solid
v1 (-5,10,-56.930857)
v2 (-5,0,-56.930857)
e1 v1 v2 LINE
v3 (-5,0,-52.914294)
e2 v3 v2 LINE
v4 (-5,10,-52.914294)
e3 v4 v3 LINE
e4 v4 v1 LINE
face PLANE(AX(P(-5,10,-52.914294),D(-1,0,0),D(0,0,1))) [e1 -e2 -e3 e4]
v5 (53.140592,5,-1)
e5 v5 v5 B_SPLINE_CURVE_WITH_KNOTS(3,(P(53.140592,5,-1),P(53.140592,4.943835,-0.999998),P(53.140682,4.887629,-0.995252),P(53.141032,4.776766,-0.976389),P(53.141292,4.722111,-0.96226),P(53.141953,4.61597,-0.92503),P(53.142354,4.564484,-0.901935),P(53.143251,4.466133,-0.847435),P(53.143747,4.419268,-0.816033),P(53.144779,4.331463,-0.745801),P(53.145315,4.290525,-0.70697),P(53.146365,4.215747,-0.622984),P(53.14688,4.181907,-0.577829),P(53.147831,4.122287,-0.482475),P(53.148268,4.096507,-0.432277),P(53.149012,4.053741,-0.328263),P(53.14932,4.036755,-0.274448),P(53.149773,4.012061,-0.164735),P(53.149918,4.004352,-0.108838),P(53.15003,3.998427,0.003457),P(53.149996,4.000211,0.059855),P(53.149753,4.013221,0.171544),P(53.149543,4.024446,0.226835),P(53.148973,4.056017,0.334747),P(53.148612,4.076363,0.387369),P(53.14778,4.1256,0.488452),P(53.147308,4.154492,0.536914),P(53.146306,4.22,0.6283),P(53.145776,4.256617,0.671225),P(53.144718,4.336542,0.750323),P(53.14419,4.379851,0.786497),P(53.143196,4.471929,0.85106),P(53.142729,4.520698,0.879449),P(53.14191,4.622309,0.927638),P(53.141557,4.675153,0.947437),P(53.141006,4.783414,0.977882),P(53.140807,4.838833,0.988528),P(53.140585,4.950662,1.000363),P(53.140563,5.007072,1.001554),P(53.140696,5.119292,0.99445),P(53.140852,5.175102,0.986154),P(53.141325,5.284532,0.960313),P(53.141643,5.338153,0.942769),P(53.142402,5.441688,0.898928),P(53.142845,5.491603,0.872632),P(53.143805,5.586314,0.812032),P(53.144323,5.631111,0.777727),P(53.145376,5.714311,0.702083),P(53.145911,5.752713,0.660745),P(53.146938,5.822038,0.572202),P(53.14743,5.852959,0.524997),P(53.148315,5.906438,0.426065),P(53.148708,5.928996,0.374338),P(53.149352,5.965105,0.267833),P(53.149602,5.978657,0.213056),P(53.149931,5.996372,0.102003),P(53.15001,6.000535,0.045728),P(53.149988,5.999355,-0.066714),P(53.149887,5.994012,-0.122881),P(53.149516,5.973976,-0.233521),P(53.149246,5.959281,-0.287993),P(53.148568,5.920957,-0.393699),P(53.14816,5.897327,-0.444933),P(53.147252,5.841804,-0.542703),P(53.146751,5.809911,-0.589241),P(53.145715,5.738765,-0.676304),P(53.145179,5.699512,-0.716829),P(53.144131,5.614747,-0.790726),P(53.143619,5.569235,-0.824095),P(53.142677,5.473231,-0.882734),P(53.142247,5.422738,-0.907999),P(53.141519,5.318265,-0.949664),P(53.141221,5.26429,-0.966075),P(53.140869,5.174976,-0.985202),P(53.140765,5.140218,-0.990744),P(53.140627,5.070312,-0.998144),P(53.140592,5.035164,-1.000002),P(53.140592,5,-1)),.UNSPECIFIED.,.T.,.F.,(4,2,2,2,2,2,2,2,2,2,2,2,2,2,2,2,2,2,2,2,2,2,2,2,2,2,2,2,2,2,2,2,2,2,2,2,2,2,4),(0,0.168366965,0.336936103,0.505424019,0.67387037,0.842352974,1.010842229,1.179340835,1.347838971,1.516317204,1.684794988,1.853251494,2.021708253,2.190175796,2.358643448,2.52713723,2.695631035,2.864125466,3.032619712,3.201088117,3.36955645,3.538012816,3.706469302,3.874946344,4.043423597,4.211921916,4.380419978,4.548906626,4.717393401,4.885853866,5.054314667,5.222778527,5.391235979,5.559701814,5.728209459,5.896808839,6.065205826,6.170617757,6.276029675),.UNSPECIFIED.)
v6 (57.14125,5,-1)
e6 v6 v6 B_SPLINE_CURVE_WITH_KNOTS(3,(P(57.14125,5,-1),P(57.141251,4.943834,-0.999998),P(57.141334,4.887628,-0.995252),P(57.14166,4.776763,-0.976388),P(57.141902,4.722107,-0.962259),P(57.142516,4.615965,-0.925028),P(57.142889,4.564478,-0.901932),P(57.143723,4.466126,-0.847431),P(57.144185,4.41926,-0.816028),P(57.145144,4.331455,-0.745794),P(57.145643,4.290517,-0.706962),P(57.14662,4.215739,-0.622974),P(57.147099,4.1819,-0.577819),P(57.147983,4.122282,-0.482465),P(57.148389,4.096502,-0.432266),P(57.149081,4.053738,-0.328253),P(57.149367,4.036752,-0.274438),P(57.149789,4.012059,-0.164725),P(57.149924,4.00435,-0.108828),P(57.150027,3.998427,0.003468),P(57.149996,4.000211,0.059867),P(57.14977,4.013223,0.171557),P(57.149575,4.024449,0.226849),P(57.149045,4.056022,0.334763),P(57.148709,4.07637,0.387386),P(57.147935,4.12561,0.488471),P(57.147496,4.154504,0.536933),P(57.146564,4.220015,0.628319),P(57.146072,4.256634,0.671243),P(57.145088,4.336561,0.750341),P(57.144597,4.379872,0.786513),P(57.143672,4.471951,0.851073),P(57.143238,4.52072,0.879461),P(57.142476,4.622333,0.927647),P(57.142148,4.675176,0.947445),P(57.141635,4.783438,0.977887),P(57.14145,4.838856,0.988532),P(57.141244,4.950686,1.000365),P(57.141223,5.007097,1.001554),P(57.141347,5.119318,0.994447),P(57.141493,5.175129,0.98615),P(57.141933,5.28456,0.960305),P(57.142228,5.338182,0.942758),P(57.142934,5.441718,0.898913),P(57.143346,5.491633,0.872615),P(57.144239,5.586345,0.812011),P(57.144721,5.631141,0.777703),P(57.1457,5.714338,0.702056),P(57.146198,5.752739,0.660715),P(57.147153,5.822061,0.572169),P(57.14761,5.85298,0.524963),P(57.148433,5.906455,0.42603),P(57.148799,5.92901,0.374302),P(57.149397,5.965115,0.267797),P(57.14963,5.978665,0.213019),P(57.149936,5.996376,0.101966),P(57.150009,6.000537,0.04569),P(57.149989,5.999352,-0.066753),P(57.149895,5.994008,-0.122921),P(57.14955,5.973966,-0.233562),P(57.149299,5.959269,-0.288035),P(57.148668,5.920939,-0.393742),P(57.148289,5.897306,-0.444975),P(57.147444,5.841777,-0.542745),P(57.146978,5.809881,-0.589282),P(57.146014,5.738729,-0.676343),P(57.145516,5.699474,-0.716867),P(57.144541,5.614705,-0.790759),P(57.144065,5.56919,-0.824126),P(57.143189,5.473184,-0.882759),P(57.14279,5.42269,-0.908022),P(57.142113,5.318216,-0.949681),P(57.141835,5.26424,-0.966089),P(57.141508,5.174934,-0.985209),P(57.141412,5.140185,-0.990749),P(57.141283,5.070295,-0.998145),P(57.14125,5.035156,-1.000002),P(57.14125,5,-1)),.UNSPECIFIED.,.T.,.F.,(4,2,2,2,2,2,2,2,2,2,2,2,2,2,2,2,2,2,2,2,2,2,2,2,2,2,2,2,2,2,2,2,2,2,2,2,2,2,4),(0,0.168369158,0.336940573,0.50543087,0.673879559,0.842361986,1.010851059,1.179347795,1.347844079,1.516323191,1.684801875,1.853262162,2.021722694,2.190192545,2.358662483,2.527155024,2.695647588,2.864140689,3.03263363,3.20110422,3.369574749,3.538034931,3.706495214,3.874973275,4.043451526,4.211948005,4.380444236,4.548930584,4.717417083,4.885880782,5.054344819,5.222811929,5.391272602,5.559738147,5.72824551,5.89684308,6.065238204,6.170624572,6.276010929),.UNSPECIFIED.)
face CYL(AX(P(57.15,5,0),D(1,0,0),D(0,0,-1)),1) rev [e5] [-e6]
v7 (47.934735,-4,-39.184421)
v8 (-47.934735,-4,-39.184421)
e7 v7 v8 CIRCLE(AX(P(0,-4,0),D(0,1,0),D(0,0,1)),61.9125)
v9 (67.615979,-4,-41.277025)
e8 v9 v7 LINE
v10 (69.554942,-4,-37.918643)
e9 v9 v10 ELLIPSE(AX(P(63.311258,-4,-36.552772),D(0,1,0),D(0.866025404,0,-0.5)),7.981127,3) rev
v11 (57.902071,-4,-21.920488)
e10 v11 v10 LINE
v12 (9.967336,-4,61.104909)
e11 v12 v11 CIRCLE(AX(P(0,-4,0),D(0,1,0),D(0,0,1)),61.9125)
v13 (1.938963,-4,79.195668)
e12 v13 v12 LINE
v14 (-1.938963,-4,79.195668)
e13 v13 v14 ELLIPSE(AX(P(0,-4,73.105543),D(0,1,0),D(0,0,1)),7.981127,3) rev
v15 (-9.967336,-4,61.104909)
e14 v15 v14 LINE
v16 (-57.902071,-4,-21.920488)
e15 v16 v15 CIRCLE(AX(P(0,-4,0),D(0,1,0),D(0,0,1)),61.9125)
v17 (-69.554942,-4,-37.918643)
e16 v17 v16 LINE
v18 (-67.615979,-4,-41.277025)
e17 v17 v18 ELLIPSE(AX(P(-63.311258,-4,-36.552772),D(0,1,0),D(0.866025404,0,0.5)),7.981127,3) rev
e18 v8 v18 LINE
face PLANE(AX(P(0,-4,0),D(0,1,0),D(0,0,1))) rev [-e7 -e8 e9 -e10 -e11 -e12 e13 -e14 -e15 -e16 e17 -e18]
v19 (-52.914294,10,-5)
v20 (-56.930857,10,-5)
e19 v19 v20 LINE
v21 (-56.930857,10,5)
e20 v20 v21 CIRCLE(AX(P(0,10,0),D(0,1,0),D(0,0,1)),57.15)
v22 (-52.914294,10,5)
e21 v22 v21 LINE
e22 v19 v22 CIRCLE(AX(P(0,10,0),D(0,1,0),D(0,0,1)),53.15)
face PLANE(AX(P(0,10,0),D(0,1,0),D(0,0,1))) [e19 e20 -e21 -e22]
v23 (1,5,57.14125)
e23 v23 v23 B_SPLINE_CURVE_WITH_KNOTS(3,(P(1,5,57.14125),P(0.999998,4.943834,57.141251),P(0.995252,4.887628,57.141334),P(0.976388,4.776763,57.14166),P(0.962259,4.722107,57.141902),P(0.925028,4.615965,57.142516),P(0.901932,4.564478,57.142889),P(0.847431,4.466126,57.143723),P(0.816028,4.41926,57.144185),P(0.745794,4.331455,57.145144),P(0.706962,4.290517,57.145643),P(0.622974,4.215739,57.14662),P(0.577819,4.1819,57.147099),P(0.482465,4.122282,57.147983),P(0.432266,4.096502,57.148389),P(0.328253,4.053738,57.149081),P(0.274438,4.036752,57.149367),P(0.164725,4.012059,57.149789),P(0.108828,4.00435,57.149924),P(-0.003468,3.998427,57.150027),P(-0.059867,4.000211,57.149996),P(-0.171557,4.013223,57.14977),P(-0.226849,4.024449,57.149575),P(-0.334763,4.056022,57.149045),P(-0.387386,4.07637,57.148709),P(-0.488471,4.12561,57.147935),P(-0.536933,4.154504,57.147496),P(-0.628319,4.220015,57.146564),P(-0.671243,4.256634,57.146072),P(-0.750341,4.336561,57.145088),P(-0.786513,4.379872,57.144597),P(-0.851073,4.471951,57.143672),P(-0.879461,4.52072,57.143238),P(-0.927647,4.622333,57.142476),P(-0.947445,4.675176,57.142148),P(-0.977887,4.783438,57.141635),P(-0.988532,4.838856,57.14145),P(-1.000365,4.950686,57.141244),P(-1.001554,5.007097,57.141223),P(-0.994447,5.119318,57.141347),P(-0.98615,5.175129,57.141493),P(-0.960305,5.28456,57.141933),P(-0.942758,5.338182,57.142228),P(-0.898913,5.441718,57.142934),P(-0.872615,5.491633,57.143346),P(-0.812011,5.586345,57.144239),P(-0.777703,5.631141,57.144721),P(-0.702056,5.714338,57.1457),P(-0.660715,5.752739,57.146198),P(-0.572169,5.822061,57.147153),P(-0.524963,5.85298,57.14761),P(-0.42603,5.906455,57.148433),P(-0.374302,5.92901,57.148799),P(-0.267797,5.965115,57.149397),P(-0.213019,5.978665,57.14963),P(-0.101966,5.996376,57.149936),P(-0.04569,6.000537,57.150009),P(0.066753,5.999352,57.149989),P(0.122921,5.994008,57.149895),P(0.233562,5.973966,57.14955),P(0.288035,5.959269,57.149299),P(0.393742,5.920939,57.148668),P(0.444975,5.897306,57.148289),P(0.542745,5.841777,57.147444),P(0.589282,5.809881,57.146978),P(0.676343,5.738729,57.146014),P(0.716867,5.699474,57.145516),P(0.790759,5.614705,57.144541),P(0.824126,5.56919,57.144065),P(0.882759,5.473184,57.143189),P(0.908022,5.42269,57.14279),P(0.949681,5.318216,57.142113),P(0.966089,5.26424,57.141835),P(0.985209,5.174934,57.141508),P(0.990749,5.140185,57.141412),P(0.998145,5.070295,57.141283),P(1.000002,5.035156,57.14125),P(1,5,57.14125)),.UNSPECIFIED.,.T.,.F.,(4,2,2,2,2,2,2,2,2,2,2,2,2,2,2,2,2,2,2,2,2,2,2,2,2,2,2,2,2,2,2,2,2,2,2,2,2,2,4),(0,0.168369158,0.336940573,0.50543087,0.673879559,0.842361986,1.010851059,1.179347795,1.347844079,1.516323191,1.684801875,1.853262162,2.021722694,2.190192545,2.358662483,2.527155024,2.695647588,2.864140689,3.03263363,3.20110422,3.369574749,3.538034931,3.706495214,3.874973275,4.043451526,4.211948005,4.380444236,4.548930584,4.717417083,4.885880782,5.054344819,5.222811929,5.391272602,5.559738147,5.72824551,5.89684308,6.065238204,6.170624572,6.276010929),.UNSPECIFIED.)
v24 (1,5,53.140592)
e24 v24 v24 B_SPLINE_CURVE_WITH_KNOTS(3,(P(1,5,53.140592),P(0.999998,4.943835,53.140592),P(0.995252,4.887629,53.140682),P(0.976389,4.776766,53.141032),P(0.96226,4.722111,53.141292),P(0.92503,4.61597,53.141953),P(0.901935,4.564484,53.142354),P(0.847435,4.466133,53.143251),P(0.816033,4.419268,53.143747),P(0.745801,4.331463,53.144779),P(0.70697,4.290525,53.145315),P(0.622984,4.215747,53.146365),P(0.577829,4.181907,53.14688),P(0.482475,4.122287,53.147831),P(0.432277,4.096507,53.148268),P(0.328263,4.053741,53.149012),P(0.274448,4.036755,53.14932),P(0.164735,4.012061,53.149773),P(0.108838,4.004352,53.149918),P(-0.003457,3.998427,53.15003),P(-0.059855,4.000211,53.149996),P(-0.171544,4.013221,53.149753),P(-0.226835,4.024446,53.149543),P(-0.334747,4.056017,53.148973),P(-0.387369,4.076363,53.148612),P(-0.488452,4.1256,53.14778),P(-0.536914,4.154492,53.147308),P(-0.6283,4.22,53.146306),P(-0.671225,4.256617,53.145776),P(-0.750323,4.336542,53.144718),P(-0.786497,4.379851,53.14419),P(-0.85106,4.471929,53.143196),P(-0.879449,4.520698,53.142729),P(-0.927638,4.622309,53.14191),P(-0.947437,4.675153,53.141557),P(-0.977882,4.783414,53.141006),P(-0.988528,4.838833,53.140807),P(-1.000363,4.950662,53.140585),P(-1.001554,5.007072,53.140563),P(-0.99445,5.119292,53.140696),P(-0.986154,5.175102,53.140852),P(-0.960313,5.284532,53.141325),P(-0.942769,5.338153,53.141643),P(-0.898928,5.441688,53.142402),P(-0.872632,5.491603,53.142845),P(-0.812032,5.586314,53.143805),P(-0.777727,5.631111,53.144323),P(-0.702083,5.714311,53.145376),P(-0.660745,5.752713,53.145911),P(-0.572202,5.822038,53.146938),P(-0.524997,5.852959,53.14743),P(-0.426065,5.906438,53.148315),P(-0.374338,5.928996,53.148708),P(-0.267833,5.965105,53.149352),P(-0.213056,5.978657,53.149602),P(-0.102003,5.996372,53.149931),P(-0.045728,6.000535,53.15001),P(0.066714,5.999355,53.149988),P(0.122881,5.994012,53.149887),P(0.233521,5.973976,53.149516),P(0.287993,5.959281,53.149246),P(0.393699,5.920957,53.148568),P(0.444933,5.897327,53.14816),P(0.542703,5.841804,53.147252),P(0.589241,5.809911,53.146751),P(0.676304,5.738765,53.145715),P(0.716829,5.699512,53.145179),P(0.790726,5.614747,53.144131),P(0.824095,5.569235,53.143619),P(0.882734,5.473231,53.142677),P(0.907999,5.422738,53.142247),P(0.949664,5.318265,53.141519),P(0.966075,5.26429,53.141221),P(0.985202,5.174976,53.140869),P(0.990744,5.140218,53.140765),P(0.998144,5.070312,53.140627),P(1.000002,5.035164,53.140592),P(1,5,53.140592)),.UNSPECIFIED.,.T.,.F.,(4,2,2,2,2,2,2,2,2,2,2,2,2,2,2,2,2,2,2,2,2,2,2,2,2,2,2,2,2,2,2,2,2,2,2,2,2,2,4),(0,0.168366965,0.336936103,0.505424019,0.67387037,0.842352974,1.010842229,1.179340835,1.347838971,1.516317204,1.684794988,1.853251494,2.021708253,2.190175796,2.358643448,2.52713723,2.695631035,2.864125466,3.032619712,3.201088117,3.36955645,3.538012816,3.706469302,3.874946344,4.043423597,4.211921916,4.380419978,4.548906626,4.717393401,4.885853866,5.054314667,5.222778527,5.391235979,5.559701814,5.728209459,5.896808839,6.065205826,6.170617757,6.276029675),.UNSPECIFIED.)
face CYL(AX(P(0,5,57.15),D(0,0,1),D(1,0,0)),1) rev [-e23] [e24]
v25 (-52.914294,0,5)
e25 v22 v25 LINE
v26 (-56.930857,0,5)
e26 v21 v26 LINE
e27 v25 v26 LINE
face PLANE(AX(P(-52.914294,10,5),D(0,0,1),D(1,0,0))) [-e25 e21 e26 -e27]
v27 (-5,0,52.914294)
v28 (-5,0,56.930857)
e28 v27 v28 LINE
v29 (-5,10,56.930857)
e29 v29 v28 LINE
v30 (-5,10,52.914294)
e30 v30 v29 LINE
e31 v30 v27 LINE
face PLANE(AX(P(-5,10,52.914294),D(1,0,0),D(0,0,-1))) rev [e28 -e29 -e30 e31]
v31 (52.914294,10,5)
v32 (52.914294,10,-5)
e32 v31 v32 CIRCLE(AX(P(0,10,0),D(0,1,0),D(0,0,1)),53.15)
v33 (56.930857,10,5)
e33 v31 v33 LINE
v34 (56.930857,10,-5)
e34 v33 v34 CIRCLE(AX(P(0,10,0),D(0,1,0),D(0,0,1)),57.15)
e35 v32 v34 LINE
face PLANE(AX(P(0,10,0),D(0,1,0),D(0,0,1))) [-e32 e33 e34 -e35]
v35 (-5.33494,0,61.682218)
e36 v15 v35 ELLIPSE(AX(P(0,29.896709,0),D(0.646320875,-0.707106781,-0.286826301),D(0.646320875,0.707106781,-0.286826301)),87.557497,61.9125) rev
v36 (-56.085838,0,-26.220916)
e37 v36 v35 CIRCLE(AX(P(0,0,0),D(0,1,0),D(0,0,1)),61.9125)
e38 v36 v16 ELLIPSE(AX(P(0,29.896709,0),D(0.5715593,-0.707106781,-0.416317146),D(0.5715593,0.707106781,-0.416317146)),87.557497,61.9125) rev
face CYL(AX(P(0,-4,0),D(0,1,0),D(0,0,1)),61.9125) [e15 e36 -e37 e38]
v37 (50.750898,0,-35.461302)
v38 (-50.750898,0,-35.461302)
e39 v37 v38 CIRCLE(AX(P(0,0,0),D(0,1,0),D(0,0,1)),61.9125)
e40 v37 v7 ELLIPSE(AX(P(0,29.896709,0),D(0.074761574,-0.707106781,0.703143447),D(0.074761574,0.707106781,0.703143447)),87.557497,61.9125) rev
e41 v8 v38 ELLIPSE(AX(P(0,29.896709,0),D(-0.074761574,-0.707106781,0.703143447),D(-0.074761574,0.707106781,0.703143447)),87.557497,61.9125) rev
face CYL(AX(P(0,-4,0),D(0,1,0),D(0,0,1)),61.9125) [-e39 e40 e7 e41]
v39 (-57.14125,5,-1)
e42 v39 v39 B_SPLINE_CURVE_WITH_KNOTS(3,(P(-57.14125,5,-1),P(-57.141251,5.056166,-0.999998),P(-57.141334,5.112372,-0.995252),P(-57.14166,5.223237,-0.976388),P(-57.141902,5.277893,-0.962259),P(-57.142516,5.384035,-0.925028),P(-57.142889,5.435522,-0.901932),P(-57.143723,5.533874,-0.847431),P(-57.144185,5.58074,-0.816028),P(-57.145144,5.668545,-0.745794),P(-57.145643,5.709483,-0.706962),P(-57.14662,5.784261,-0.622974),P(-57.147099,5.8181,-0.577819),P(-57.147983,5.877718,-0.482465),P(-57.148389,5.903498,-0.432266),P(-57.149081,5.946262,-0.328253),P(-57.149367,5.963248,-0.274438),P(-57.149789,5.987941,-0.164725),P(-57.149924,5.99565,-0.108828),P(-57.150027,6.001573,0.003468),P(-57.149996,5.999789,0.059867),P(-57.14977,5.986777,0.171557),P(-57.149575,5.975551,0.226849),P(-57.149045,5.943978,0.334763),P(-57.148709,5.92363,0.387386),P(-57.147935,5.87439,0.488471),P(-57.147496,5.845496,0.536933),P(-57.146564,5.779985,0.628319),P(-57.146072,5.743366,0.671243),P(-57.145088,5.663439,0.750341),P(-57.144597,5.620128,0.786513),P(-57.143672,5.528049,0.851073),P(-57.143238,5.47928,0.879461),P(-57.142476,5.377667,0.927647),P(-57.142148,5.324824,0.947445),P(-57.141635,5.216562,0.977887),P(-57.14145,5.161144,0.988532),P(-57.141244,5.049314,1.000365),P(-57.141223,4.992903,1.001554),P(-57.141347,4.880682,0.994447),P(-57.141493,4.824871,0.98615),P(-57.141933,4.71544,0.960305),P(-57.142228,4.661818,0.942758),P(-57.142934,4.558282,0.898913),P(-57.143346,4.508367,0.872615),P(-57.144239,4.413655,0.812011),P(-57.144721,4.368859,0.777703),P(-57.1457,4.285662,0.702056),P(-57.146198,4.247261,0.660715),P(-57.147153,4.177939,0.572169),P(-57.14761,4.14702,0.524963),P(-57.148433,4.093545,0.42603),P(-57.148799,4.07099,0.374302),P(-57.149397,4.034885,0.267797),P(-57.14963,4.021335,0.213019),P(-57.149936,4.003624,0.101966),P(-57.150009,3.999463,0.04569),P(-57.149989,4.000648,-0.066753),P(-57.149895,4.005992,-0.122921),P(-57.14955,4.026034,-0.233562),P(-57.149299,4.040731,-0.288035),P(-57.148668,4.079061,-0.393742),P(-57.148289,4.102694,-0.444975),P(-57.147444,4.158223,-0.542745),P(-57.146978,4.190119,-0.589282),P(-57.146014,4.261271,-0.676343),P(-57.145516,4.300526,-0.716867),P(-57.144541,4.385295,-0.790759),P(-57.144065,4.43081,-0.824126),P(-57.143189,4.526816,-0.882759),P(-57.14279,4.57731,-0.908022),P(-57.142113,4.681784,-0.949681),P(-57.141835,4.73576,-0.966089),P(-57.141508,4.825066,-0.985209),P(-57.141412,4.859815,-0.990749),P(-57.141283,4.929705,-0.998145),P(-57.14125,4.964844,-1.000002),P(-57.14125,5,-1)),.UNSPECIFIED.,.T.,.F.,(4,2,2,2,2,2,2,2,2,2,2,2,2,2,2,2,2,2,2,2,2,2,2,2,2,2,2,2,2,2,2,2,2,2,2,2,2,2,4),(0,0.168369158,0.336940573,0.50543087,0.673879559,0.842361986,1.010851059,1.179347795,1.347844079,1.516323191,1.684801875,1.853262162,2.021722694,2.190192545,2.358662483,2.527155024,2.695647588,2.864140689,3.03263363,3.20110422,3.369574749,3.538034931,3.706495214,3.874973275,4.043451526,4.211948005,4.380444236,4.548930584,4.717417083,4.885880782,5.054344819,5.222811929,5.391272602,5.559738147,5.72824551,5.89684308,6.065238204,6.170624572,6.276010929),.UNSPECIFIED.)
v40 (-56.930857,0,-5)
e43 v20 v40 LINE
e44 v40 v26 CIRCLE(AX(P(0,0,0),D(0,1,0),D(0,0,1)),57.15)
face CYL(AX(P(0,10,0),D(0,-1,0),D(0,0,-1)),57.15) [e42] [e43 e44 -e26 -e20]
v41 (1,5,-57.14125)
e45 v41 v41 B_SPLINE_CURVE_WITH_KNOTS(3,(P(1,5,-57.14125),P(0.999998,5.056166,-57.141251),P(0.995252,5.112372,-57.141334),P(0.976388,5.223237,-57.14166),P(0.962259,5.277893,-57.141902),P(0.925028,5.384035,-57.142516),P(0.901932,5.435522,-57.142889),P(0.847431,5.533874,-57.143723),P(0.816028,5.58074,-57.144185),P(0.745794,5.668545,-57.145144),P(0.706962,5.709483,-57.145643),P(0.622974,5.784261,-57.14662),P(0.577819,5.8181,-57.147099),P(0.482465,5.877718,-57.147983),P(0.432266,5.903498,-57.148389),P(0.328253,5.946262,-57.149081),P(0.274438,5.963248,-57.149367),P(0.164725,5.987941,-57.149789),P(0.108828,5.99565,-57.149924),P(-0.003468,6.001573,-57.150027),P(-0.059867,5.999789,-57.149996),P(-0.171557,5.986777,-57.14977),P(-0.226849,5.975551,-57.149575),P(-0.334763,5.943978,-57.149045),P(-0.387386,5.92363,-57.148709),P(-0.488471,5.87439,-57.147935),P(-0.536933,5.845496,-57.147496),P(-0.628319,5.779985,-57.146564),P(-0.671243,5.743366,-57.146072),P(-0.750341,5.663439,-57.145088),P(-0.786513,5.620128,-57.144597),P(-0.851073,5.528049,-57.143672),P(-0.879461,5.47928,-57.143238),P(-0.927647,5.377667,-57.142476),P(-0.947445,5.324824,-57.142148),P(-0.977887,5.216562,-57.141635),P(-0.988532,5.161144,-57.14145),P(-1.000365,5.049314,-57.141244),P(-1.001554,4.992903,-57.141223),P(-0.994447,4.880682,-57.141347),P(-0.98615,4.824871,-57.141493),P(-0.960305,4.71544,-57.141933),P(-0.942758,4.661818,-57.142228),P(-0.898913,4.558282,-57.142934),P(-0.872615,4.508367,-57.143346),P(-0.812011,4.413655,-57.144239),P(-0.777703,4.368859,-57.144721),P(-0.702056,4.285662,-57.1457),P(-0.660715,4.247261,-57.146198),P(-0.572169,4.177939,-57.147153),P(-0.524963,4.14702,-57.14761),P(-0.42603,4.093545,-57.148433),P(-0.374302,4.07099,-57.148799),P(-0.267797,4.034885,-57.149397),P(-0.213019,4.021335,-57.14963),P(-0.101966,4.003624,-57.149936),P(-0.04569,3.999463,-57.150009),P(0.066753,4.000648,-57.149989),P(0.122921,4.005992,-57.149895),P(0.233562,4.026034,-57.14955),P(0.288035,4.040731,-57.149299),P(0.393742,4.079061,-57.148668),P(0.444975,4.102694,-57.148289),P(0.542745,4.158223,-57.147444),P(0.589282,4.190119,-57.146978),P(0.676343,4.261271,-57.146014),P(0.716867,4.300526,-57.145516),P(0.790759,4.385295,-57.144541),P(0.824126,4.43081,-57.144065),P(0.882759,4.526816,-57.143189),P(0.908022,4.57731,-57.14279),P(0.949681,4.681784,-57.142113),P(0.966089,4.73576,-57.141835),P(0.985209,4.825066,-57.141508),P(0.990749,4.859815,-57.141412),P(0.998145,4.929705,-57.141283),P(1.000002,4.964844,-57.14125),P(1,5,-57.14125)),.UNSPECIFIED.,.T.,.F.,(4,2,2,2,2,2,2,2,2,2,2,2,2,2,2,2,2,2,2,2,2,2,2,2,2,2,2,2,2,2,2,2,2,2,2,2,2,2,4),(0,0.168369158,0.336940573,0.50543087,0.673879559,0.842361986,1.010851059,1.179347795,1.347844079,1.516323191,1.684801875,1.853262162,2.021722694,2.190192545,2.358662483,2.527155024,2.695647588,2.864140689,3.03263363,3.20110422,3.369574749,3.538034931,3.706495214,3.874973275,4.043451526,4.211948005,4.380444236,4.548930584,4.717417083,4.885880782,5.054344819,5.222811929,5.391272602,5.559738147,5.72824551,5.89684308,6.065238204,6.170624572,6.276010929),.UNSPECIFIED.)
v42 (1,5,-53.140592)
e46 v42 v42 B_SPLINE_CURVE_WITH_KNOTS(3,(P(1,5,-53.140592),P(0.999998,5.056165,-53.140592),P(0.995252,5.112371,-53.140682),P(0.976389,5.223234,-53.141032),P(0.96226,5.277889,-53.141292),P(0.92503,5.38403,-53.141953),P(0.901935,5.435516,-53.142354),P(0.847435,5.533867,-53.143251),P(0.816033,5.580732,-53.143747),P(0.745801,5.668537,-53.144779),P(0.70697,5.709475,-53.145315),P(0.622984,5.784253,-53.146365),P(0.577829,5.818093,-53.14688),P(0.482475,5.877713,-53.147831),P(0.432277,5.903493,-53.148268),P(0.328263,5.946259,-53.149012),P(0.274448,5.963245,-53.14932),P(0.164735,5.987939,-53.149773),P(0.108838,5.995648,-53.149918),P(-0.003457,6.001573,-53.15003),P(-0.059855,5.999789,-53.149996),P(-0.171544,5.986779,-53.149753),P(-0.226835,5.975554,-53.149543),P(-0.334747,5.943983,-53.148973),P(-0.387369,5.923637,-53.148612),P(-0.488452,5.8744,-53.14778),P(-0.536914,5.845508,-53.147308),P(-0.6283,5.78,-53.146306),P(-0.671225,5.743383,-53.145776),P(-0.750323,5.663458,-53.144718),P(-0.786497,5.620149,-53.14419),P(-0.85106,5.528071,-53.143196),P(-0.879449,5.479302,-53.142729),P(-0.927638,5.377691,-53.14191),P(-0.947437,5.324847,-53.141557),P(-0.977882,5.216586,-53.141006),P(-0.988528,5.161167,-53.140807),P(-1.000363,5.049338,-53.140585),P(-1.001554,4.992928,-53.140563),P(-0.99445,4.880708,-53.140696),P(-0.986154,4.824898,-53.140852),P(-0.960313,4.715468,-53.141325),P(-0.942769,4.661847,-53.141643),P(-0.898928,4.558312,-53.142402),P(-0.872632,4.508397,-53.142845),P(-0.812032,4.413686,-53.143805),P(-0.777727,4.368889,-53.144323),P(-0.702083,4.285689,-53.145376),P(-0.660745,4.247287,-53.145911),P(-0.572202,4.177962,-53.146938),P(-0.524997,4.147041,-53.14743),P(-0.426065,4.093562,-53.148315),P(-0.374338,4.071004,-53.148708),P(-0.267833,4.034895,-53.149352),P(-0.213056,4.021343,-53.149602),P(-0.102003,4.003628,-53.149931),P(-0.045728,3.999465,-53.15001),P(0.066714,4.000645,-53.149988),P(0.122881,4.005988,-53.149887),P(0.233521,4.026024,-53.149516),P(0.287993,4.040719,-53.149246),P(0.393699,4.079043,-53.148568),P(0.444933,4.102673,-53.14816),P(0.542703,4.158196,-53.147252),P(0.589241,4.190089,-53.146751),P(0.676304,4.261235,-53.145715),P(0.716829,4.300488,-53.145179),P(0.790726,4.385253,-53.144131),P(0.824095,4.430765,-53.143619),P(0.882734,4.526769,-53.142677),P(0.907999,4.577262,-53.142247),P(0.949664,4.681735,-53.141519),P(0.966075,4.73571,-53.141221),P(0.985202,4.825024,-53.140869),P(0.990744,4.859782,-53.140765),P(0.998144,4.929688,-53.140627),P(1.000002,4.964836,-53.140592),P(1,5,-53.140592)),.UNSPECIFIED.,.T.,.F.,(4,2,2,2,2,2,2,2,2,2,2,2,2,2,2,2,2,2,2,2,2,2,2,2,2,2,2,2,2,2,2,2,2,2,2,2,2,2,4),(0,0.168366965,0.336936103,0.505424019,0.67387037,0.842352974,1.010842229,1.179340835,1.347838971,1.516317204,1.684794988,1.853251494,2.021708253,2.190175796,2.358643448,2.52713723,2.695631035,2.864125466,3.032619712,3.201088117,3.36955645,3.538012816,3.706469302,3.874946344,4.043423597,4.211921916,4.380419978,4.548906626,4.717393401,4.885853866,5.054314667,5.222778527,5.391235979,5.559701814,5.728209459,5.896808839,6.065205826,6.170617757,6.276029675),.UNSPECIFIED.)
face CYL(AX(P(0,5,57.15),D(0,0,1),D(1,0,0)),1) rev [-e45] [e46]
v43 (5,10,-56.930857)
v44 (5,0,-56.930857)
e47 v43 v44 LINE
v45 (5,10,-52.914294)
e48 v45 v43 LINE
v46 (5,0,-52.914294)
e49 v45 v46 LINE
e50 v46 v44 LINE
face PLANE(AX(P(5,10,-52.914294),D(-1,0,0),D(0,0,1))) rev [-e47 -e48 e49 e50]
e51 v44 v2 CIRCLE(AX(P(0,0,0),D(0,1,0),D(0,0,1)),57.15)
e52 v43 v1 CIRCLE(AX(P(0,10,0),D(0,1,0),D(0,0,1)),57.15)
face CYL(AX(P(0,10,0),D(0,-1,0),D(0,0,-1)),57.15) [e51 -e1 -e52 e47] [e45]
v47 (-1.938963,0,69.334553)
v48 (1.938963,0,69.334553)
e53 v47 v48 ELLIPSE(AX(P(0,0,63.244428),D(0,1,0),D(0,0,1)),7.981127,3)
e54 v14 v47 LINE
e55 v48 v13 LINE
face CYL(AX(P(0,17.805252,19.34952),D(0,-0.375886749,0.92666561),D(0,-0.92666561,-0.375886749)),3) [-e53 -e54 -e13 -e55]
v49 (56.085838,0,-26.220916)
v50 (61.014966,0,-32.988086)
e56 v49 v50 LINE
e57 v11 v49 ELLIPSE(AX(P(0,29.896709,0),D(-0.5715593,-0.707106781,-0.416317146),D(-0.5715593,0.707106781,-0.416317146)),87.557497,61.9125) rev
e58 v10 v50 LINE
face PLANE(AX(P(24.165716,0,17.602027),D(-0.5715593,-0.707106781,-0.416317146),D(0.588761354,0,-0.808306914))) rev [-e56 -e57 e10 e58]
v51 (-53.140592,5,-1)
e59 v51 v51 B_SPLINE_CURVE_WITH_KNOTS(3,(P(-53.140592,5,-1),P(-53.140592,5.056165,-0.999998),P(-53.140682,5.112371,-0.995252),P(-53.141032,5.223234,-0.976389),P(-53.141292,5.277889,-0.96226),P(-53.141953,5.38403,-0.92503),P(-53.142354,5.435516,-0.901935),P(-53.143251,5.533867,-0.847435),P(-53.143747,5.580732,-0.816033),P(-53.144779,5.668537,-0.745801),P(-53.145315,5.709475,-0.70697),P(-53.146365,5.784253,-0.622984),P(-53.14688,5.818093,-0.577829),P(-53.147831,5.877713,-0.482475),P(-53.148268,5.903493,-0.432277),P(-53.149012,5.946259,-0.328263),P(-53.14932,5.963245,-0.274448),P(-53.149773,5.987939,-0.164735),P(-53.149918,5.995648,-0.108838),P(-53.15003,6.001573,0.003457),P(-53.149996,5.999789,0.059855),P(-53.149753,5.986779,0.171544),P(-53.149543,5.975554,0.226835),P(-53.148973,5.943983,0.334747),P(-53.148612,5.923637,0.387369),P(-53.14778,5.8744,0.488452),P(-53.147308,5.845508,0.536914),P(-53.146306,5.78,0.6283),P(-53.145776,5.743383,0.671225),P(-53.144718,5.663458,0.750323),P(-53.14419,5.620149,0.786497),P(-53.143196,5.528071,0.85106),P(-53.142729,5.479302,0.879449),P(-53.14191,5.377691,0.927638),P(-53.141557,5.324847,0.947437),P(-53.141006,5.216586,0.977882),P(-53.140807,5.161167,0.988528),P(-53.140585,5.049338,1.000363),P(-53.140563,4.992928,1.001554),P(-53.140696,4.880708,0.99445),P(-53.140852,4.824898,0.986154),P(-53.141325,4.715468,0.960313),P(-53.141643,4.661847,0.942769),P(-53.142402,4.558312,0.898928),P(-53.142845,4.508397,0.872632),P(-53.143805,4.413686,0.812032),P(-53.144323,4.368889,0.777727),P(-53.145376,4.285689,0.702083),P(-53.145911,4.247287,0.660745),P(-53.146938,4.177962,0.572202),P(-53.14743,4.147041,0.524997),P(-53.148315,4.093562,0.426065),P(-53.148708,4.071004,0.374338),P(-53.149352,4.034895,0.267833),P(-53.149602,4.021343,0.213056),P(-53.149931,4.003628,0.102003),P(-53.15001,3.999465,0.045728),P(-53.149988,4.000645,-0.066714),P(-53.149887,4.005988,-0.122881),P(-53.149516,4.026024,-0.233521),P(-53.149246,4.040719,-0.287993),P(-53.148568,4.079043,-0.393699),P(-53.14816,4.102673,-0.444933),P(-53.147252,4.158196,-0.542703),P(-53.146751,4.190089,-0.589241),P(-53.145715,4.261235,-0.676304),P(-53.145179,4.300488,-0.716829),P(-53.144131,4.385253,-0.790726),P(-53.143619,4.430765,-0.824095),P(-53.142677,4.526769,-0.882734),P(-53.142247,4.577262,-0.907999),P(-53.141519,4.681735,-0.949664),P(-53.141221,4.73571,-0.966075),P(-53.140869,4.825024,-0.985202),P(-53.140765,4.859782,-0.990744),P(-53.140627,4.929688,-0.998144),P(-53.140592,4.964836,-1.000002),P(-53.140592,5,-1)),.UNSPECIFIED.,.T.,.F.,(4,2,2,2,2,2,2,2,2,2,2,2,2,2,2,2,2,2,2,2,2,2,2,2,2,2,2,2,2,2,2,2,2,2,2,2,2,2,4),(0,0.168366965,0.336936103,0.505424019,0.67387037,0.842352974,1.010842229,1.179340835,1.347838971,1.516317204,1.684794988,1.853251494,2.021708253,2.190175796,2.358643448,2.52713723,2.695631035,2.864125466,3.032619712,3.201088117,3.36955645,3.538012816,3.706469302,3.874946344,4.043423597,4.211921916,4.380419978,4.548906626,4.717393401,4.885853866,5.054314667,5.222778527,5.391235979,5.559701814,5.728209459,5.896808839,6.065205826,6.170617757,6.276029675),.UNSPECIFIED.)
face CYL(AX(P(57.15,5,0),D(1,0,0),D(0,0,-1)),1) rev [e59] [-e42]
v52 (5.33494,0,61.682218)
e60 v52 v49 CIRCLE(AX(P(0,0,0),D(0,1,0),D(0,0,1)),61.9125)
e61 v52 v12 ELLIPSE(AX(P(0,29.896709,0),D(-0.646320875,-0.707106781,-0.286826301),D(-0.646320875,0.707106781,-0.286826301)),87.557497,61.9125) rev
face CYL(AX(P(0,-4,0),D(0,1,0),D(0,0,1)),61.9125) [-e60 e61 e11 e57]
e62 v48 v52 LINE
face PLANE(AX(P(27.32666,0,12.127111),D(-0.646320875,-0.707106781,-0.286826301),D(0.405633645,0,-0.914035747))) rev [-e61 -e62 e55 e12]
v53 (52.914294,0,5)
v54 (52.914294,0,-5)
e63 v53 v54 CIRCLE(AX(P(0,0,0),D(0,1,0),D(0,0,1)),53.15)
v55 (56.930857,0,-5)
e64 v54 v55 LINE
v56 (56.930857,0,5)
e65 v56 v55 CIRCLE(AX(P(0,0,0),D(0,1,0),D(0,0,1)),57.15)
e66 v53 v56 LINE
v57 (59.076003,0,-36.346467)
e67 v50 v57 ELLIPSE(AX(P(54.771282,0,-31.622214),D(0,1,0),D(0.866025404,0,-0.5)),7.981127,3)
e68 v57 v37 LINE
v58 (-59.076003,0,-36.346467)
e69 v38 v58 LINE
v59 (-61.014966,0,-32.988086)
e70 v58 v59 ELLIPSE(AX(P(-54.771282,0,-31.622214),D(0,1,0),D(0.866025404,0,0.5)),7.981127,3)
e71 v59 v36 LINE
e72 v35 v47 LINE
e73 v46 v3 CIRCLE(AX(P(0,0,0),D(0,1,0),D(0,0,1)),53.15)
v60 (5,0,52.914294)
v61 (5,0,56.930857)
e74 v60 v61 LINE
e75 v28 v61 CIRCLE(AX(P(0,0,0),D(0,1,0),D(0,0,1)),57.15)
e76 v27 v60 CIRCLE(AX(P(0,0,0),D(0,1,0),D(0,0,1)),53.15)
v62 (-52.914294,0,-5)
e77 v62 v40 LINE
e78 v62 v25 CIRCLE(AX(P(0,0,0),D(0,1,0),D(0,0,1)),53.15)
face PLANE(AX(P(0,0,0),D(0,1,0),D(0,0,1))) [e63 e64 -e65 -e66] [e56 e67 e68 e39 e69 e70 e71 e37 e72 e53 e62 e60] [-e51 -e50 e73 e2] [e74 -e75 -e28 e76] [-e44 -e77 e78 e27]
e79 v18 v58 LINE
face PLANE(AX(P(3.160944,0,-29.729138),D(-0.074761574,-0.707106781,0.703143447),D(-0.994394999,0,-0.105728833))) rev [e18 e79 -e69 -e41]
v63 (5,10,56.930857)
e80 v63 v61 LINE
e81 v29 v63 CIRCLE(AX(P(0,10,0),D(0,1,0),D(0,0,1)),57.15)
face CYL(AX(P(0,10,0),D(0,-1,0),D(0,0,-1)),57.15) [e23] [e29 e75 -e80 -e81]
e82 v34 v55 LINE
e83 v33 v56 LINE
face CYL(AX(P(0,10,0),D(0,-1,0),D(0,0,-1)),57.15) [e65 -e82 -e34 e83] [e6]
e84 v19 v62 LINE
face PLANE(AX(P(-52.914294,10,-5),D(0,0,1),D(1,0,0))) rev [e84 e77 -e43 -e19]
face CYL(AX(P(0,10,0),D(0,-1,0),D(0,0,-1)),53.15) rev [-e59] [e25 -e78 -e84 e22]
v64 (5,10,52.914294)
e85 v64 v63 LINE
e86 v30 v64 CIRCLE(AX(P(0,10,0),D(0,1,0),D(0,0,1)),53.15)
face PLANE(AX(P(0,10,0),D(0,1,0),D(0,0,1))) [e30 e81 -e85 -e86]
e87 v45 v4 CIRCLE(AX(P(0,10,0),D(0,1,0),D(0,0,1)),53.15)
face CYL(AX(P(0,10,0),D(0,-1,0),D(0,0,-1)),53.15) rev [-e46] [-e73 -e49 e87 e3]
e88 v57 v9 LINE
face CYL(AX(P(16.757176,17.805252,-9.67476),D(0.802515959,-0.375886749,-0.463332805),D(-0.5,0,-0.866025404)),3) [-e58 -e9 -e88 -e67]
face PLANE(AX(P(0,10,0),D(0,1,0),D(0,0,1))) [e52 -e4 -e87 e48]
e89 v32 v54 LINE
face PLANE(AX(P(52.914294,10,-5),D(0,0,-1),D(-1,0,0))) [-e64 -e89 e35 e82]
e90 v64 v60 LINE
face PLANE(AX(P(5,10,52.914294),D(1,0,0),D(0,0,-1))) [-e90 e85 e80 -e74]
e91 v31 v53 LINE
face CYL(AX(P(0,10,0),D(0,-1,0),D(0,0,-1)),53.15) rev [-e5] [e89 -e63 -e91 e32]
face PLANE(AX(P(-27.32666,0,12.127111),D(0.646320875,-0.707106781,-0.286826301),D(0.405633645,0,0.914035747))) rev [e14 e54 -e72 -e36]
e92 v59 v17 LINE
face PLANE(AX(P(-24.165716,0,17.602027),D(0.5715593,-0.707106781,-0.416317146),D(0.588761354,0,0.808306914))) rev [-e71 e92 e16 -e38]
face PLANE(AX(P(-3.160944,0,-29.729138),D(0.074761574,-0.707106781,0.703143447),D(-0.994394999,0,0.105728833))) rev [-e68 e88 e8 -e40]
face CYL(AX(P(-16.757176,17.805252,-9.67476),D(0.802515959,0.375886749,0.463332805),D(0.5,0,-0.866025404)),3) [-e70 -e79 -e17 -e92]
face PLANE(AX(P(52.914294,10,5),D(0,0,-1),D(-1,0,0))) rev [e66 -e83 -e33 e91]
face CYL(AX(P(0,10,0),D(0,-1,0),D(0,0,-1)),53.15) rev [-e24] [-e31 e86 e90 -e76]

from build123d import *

# Parameters (mm, degrees)
SKETCH4_R            = 61.9125
BOSS_EXTRUDE1_DEPTH  = 4
BOSS_EXTRUDE2_DEPTH  = 10
M2_CLEARANCE_HOLE2_D = 2
M2_CLEARANCE_HOLE3_D = 2
BOSS_EXTRUDE3_DEPTH  = 4
CHAMFER1_SIZE        = 4
FILLET1_R            = 3


# Some blends are built 0.0001 mm under size
with BuildPart() as part:
    # Sketch4 → Boss-Extrude1 (new body)
    with BuildSketch(Plane(origin=(0, 0, 0), x_dir=(1, 0, 0), z_dir=(0, 1, 0))):
        with Locations(Location((0, 0, 0), (0, 0, 270))):
            Circle(SKETCH4_R)
    extrude(amount=-BOSS_EXTRUDE1_DEPTH)

    # Sketch15 → Boss-Extrude2 (add)
    with BuildSketch(Plane(origin=(0, 0, 0), x_dir=(1, 0, 0), z_dir=(0, 1, 0))):
        with BuildLine():
            Line((-52.91429391, -5), (-56.930857187, -5))
            ThreePointArc((-56.930857187, -5), (-57.15, 0), (-56.930857187, 5))
            Line((-56.930857187, 5), (-52.91429391, 5))
            ThreePointArc((-52.91429391, 5), (-53.15, 0), (-52.91429391, -5))
        make_face()
        with BuildLine():
            Line((-5, 52.91429391), (-5, 56.930857187))
            ThreePointArc((-5, 56.930857187), (0, 57.15), (5, 56.930857187))
            Line((5, 56.930857187), (5, 52.91429391))
            ThreePointArc((5, 52.91429391), (0, 53.15), (-5, 52.91429391))
        make_face()
        with BuildLine():
            Line((-5, -52.91429391), (-5, -56.930857187))
            ThreePointArc((-5, -56.930857187), (0, -57.15), (5, -56.930857187))
            Line((5, -56.930857187), (5, -52.91429391))
            ThreePointArc((5, -52.91429391), (0, -53.15), (-5, -52.91429391))
        make_face()
        with BuildLine():
            Line((52.91429391, 5), (56.930857187, 5))
            ThreePointArc((56.930857187, 5), (57.15, 0), (56.930857187, -5))
            Line((56.930857187, -5), (52.91429391, -5))
            ThreePointArc((52.91429391, -5), (53.15, 0), (52.91429391, 5))
        make_face()
    extrude(amount=BOSS_EXTRUDE2_DEPTH)

    # M2 Clearance Hole2 (through all)
    with Locations(Plane(origin=(0, 5, 57.15), x_dir=(1, 0, 0), z_dir=(0, 0, 1))):
        with Locations((0, 0)):
            Hole(M2_CLEARANCE_HOLE2_D / 2)

    # M2 Clearance Hole3 (through all)
    with Locations(Plane(origin=(57.15, 5, 0), x_dir=(0, 0, 1), z_dir=(1, 0, 0))):
        with Locations((0, 0)):
            Hole(M2_CLEARANCE_HOLE3_D / 2)

    # Sketch19 → Boss-Extrude3 (add)
    with BuildSketch(Plane(origin=(0, 0, 0), x_dir=(1, 0, 0), z_dir=(0, 1, 0))):
        with BuildLine():
            Line((9.967336465, -61.104908641), (0, -83.564835105))
            Line((0, -83.564835105), (-9.967336465, -61.104908641))
            ThreePointArc((-9.967336465, -61.104908641), (0, -61.9125), (9.967336465, -61.104908641))
        make_face()
        with BuildLine():
            Line((-47.934734947, 39.184420907), (-72.369270064, 41.782417553))
            Line((-72.369270064, 41.782417553), (-57.902071411, 21.920487734))
            ThreePointArc((-57.902071411, 21.920487734), (-53.617797812, 30.95625), (-47.934734947, 39.184420907))
        make_face()
        with BuildLine():
            Line((57.902071411, 21.920487734), (72.369270064, 41.782417553))
            Line((72.369270064, 41.782417553), (47.934734947, 39.184420907))
            ThreePointArc((47.934734947, 39.184420907), (53.617797812, 30.95625), (57.902071411, 21.920487734))
        make_face()
    extrude(amount=-BOSS_EXTRUDE3_DEPTH)

    # Chamfer1
    chamfer1_edges = [part.edges().sort_by_distance(p)[0] for p in [
        (-60.152002506, 0, -40.48341923),
        (-65.135670738, 0, -31.851452643),
        (60.152002506, 0, -40.48341923),
        (65.135670738, 0, -31.851452643),
        (4.983668232, 0, 72.334871873),
        (-4.983668232, 0, 72.334871873),
    ]]
    chamfer(chamfer1_edges, length=CHAMFER1_SIZE - 0.0001)  # a hair under: the kernel refuses the full size

    # Fillet1
    # the kernel refuses this fillet: 3 mm, written as the material it takes off along each edge
    with BuildSketch(Plane(origin=(-58.731491813, 2.387836055, -33.908642608), x_dir=(-0.1711376698055133, -0.5989233275147531, 0.7823060435227348), z_dir=(-0.8025159588326043, -0.3758867485808155, -0.46333280486096456)), Plane(origin=(58.731491813, 2.387836055, -33.908642608), x_dir=(-0.5919280723220329, -0.5989233275147517, -0.5393625913574092), z_dir=(0.80251595883259, -0.3758867485808147, -0.4633328048609902))) as fillet1_piece_1:
        with BuildLine():
            CenterArc((FILLET1_R * 0.847005492593, -FILLET1_R), FILLET1_R, 90, 80.529565024)
            Line((-FILLET1_R * 0.139365143358, -FILLET1_R * 0.835461346383), (0, 0))
            Line((0, 0), (FILLET1_R * 0.847005492593, 0))
        make_face()
    extrude(amount=23.346319451, mode=Mode.SUBTRACT)
    with BuildSketch(Plane(origin=(0, 2.387836055, 67.817285216), x_dir=(-0.7630657421275423, -0.5989233275147525, -0.24294345216531282), z_dir=(0, -0.37588674858081544, 0.9266656097219444))) as fillet1_piece_2:
        with BuildLine():
            CenterArc((FILLET1_R * 0.847005492593, FILLET1_R), FILLET1_R, 189.470434976, 80.529565024)
            Line((-FILLET1_R * 0.139365143358, FILLET1_R * 0.835461346383), (0, 0))
            Line((0, 0), (FILLET1_R * 0.847005492593, 0))
        make_face()
    extrude(amount=23.346319451, mode=Mode.SUBTRACT)


solid = part.part
